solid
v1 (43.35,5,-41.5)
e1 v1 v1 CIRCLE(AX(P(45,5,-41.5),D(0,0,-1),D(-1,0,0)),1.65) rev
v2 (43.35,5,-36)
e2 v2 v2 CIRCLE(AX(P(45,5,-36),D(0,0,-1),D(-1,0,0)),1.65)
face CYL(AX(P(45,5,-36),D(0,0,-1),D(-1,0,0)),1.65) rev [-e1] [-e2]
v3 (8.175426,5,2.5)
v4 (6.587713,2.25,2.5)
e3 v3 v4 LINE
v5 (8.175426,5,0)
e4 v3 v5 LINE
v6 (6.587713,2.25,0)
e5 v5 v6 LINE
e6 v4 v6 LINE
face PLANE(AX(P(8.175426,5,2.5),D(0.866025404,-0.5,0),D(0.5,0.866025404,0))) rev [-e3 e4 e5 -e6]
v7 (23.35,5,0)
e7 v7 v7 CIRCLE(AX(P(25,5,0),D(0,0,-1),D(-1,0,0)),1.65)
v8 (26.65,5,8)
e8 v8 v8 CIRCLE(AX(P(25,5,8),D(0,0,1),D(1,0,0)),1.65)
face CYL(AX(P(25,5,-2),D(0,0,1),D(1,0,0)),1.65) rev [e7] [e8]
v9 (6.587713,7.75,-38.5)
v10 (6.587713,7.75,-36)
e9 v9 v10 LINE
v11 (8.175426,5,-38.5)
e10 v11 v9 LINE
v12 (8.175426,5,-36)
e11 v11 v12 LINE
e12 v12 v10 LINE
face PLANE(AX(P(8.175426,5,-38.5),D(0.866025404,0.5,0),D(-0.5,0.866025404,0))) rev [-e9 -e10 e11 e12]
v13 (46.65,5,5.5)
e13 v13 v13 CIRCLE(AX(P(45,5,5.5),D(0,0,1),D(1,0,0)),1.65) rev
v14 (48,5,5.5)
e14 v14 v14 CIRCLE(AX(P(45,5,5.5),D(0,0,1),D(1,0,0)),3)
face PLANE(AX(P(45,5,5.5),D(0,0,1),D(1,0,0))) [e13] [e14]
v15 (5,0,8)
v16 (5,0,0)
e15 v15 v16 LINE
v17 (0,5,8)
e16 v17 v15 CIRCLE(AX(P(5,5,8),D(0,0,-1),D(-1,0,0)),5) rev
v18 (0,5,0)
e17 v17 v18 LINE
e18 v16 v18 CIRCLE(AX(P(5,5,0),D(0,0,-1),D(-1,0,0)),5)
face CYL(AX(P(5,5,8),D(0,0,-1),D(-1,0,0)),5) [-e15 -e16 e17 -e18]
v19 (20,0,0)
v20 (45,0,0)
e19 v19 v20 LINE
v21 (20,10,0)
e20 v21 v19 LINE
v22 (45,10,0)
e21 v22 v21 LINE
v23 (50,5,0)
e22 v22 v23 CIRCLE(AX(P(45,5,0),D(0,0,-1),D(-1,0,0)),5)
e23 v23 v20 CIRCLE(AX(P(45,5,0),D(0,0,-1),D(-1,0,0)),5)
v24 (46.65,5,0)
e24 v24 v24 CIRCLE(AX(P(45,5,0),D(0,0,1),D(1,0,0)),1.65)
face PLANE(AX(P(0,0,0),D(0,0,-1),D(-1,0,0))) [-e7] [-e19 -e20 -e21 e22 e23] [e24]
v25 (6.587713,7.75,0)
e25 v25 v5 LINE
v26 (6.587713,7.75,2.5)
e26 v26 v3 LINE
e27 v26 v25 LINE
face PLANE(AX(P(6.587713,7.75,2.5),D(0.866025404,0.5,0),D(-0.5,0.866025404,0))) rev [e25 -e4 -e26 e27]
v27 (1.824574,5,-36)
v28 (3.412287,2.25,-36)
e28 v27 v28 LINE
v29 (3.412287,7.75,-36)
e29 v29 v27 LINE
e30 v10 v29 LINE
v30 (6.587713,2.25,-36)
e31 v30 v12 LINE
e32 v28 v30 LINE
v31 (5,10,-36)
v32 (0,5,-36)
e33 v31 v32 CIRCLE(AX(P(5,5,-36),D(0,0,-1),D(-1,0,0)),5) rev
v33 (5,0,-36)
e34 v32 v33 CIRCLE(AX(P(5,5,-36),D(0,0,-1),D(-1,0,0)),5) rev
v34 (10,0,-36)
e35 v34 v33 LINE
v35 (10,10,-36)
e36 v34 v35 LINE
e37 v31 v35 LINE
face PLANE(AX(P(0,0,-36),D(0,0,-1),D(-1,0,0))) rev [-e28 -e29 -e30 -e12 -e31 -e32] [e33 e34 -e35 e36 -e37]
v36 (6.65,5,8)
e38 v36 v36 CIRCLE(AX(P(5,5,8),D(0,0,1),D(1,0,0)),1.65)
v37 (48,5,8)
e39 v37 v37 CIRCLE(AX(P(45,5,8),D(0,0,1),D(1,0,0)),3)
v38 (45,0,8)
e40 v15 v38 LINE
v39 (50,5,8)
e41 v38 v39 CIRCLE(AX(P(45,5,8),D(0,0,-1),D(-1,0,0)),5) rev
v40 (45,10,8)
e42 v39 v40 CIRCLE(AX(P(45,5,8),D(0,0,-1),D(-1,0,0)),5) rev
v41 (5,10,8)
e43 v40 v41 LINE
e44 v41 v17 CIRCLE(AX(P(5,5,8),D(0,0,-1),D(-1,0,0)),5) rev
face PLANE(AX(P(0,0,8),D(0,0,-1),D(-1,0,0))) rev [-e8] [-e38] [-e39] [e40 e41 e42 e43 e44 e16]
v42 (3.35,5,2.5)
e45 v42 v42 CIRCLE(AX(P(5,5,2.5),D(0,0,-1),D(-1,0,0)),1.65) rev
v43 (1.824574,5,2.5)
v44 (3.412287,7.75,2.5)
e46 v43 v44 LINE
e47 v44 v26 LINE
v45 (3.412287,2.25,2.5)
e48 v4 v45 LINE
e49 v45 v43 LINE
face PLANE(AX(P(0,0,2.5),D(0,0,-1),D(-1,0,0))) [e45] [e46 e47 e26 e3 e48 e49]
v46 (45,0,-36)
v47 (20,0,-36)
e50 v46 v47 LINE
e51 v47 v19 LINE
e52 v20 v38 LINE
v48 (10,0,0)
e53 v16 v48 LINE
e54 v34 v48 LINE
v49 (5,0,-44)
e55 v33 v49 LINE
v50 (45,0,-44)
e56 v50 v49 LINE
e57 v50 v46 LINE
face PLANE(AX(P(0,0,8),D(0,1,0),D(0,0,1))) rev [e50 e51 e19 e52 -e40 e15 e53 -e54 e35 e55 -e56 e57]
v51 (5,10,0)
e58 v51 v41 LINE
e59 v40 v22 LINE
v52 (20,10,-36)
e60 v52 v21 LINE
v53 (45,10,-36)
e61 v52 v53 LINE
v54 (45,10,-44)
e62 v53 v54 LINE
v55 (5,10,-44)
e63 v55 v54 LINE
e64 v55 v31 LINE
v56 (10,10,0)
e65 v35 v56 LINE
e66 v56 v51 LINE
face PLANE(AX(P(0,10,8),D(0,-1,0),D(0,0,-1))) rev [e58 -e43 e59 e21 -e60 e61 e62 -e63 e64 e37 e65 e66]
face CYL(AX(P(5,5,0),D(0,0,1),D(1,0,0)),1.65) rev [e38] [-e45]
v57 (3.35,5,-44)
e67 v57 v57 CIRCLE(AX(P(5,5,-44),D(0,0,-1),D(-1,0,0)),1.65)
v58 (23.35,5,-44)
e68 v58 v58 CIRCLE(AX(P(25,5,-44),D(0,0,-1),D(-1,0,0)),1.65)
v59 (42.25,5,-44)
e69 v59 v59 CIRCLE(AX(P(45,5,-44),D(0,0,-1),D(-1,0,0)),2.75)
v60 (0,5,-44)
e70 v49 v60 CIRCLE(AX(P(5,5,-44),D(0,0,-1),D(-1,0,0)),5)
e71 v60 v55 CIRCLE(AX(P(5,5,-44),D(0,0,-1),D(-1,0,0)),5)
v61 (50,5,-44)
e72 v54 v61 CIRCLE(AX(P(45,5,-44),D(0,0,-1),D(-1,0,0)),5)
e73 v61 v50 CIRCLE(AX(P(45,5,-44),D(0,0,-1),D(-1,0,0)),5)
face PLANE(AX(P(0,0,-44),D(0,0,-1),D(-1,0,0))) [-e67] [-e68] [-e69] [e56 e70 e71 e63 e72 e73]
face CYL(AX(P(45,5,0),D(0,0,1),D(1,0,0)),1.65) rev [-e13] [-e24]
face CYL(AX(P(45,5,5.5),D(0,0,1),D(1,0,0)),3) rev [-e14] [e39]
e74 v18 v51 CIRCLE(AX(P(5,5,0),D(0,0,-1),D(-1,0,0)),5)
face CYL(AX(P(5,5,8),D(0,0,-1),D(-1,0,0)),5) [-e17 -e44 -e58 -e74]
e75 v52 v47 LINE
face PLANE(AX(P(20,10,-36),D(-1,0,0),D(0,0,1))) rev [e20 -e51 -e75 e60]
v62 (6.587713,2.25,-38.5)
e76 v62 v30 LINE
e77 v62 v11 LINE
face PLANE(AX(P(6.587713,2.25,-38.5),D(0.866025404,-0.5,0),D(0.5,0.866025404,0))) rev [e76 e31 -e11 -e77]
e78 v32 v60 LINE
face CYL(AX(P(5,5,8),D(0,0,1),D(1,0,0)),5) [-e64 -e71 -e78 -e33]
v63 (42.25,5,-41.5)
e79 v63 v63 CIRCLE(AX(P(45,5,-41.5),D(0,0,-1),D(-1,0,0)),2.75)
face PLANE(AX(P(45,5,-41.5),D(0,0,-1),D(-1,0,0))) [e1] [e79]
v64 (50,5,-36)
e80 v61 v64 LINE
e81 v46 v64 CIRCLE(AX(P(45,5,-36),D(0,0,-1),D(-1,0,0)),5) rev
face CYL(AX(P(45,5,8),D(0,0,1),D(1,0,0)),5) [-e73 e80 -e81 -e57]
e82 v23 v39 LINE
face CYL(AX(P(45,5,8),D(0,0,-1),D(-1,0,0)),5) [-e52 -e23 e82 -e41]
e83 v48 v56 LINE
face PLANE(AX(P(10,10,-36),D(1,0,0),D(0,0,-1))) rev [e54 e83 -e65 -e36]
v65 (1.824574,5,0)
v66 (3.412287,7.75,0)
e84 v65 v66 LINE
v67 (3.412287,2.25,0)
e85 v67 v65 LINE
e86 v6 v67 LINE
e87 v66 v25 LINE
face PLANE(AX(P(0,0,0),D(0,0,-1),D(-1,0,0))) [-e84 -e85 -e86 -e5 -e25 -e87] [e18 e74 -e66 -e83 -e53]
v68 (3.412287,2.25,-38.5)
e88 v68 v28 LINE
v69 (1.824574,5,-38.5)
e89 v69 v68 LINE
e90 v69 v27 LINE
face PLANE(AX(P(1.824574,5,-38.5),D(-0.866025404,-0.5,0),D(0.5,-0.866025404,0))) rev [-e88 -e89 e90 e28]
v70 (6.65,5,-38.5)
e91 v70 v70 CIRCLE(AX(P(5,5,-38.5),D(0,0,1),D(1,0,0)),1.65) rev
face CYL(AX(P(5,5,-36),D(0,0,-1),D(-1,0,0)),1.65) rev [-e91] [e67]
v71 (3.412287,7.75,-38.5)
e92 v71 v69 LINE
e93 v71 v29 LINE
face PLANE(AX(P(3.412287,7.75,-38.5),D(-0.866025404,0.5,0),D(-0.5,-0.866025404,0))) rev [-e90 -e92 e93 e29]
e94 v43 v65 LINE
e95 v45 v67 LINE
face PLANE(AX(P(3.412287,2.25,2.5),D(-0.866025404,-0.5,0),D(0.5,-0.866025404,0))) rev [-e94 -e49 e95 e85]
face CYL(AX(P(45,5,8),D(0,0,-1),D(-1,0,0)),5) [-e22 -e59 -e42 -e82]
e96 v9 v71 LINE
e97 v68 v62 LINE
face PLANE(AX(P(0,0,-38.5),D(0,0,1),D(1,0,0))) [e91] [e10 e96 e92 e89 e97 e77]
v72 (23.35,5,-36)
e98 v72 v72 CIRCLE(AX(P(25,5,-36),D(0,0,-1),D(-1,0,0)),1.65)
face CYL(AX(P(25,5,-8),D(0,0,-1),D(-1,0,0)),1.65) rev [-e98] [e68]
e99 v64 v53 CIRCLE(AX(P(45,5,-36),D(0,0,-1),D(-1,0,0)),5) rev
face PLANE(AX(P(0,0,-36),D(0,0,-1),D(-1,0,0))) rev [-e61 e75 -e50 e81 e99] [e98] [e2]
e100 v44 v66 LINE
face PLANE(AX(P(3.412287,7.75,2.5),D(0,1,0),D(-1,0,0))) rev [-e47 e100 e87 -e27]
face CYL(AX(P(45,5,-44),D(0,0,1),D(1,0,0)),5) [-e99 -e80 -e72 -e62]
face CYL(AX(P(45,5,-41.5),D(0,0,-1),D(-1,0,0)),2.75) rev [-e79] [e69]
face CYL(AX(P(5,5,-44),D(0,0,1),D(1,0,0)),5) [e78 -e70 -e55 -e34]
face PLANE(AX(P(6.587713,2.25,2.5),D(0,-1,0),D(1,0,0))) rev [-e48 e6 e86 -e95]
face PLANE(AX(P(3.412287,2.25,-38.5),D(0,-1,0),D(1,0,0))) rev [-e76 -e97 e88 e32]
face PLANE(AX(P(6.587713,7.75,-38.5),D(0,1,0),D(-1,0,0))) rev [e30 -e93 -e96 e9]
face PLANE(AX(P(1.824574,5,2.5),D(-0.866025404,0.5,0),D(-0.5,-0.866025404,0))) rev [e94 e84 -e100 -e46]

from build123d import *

# Parameters (mm, degrees)
SKICA1_W                 = 50
SKICA1_H                 = 10
P_IDAT_VYSUNUT_M1_DEPTH  = 8
SKICA2_R                 = 1.65
ODEBRAT_VYSUNUT_M1_DEPTH = 52.613951602
ZAOBLIT2_R               = 5
SKICA4_R                 = 1.65
ODEBRAT_VYSUNUT_M2_DEPTH = 10
ODEBRAT_VYSUNUT_M3_DEPTH = 2.5
SKICA6_R                 = 3
ODEBRAT_VYSUNUT_M4_DEPTH = 2.5
SKICA7_W                 = 10
SKICA7_H                 = 10
P_IDAT_VYSUNUT_M2_DEPTH  = 36
SKICA8_W                 = 50
SKICA8_H                 = 10
P_IDAT_VYSUNUT_M3_DEPTH  = 8
ZAOBLIT3_R               = 5
ODEBRAT_START            = -8
SKICA9_R                 = 1.65
ODEBRAT_VYSUNUT_M5_DEPTH = 8
SKICA10_R                = 2.75
ODEBRAT_VYSUNUT_M6_DEPTH = 2.5
ODEBRAT_VYSUNUT_M7_DEPTH = 2.5
ODEBRAT_START_2          = -36
SKICA12_R                = 1.65
ODEBRAT_VYSUNUT_M8_DEPTH = 36


with BuildPart() as part:
    # Skica1 → Přidat vysunutím1 (new body)
    with BuildSketch(Plane.XY):
        with Locations((25, 5)):
            Rectangle(SKICA1_W, SKICA1_H)
    extrude(amount=P_IDAT_VYSUNUT_M1_DEPTH)

    # Skica2 → Odebrat vysunutím1 (cut, through all)
    with BuildSketch(Plane.XY.offset(8)):
        with Locations((5, 5)):
            Circle(SKICA2_R)
        with Locations((45, 5)):
            Circle(SKICA2_R)
    extrude(amount=-ODEBRAT_VYSUNUT_M1_DEPTH, mode=Mode.SUBTRACT)

    # Zaoblit2
    zaoblit2_edges = [part.edges().sort_by_distance(p)[0] for p in [
        (50, 0, 4),
        (50, 10, 4),
        (0, 0, 4),
        (0, 10, 4),
    ]]
    fillet(zaoblit2_edges, radius=ZAOBLIT2_R - 0.0001)  # a hair under: the kernel refuses the full size

    # Skica4 → Odebrat vysunutím2 (cut)
    with BuildSketch(Plane.XY.offset(8)):
        with Locations((25, 5)):
            Circle(SKICA4_R)
    extrude(amount=-ODEBRAT_VYSUNUT_M2_DEPTH, mode=Mode.SUBTRACT)

    # Skica5 → Odebrat vysunutím3 (cut)
    with BuildSketch(Plane(origin=(0, 0, 0), x_dir=(-1, 0, 0), z_dir=(0, 0, -1))):
        Polygon((-1.824573519, 5), (-3.41228676, 7.75), (-6.58771324, 7.75), (-8.175426481, 5), (-6.58771324, 2.25), (-3.41228676, 2.25), align=None)
    extrude(amount=-ODEBRAT_VYSUNUT_M3_DEPTH, mode=Mode.SUBTRACT)

    # Skica6 → Odebrat vysunutím4 (cut)
    with BuildSketch(Plane.XY.offset(8)):
        with Locations((45, 5)):
            Circle(SKICA6_R)
    extrude(amount=-ODEBRAT_VYSUNUT_M4_DEPTH, mode=Mode.SUBTRACT)

    # Skica7 → Přidat vysunutím2 (add)
    with BuildSketch(Plane(origin=(0, 0, 0), x_dir=(-1, 0, 0), z_dir=(0, 0, -1))):
        with Locations((-15, 5)):
            Rectangle(SKICA7_W, SKICA7_H)
    extrude(amount=P_IDAT_VYSUNUT_M2_DEPTH)

    # Skica8 → Přidat vysunutím3 (add)
    with BuildSketch(Plane(origin=(0, 0, -36), x_dir=(-1, 0, 0), z_dir=(0, 0, -1))):
        with Locations((-25, 5)):
            Rectangle(SKICA8_W, SKICA8_H)
    extrude(amount=P_IDAT_VYSUNUT_M3_DEPTH)

    # Zaoblit3
    zaoblit3_edges = [part.edges().sort_by_distance(p)[0] for p in [
        (0, 0, -40),
        (0, 10, -40),
        (50, 0, -40),
        (50, 10, -40),
    ]]
    fillet(zaoblit3_edges, radius=ZAOBLIT3_R - 0.0001)  # a hair under: the kernel refuses the full size

    # Skica9 → Odebrat vysunutím5 (cut)
    with BuildSketch(Plane(origin=(0, 0, -44), x_dir=(-1, 0, 0), z_dir=(0, 0, -1)).offset(ODEBRAT_START)):
        with Locations(Location((-45, 5, 0), (0, 0, 180))):
            Circle(SKICA9_R)
        with Locations(Location((-5, 5, 0), (0, 0, 180))):
            Circle(SKICA9_R)
    extrude(amount=ODEBRAT_VYSUNUT_M5_DEPTH, mode=Mode.SUBTRACT)

    # Skica10 → Odebrat vysunutím6 (cut)
    with BuildSketch(Plane(origin=(0, 0, -44), x_dir=(-1, 0, 0), z_dir=(0, 0, -1))):
        with Locations((-45, 5)):
            Circle(SKICA10_R)
    extrude(amount=-ODEBRAT_VYSUNUT_M6_DEPTH, mode=Mode.SUBTRACT)

    # Skica11 → Odebrat vysunutím7 (cut)
    with BuildSketch(Plane.XY.offset(-36)):
        Polygon((1.824573519, 5), (3.41228676, 2.25), (6.58771324, 2.25), (8.175426481, 5), (6.58771324, 7.75), (3.41228676, 7.75), align=None)
    extrude(amount=-ODEBRAT_VYSUNUT_M7_DEPTH, mode=Mode.SUBTRACT)

    # Skica12 → Odebrat vysunutím8 (cut)
    with BuildSketch(Plane(origin=(0, 0, -44), x_dir=(-1, 0, 0), z_dir=(0, 0, -1)).offset(ODEBRAT_START_2)):
        with Locations(Location((-25, 5, 0), (0, 0, 180))):
            Circle(SKICA12_R)
    extrude(amount=ODEBRAT_VYSUNUT_M8_DEPTH, mode=Mode.SUBTRACT)


solid = part.part
